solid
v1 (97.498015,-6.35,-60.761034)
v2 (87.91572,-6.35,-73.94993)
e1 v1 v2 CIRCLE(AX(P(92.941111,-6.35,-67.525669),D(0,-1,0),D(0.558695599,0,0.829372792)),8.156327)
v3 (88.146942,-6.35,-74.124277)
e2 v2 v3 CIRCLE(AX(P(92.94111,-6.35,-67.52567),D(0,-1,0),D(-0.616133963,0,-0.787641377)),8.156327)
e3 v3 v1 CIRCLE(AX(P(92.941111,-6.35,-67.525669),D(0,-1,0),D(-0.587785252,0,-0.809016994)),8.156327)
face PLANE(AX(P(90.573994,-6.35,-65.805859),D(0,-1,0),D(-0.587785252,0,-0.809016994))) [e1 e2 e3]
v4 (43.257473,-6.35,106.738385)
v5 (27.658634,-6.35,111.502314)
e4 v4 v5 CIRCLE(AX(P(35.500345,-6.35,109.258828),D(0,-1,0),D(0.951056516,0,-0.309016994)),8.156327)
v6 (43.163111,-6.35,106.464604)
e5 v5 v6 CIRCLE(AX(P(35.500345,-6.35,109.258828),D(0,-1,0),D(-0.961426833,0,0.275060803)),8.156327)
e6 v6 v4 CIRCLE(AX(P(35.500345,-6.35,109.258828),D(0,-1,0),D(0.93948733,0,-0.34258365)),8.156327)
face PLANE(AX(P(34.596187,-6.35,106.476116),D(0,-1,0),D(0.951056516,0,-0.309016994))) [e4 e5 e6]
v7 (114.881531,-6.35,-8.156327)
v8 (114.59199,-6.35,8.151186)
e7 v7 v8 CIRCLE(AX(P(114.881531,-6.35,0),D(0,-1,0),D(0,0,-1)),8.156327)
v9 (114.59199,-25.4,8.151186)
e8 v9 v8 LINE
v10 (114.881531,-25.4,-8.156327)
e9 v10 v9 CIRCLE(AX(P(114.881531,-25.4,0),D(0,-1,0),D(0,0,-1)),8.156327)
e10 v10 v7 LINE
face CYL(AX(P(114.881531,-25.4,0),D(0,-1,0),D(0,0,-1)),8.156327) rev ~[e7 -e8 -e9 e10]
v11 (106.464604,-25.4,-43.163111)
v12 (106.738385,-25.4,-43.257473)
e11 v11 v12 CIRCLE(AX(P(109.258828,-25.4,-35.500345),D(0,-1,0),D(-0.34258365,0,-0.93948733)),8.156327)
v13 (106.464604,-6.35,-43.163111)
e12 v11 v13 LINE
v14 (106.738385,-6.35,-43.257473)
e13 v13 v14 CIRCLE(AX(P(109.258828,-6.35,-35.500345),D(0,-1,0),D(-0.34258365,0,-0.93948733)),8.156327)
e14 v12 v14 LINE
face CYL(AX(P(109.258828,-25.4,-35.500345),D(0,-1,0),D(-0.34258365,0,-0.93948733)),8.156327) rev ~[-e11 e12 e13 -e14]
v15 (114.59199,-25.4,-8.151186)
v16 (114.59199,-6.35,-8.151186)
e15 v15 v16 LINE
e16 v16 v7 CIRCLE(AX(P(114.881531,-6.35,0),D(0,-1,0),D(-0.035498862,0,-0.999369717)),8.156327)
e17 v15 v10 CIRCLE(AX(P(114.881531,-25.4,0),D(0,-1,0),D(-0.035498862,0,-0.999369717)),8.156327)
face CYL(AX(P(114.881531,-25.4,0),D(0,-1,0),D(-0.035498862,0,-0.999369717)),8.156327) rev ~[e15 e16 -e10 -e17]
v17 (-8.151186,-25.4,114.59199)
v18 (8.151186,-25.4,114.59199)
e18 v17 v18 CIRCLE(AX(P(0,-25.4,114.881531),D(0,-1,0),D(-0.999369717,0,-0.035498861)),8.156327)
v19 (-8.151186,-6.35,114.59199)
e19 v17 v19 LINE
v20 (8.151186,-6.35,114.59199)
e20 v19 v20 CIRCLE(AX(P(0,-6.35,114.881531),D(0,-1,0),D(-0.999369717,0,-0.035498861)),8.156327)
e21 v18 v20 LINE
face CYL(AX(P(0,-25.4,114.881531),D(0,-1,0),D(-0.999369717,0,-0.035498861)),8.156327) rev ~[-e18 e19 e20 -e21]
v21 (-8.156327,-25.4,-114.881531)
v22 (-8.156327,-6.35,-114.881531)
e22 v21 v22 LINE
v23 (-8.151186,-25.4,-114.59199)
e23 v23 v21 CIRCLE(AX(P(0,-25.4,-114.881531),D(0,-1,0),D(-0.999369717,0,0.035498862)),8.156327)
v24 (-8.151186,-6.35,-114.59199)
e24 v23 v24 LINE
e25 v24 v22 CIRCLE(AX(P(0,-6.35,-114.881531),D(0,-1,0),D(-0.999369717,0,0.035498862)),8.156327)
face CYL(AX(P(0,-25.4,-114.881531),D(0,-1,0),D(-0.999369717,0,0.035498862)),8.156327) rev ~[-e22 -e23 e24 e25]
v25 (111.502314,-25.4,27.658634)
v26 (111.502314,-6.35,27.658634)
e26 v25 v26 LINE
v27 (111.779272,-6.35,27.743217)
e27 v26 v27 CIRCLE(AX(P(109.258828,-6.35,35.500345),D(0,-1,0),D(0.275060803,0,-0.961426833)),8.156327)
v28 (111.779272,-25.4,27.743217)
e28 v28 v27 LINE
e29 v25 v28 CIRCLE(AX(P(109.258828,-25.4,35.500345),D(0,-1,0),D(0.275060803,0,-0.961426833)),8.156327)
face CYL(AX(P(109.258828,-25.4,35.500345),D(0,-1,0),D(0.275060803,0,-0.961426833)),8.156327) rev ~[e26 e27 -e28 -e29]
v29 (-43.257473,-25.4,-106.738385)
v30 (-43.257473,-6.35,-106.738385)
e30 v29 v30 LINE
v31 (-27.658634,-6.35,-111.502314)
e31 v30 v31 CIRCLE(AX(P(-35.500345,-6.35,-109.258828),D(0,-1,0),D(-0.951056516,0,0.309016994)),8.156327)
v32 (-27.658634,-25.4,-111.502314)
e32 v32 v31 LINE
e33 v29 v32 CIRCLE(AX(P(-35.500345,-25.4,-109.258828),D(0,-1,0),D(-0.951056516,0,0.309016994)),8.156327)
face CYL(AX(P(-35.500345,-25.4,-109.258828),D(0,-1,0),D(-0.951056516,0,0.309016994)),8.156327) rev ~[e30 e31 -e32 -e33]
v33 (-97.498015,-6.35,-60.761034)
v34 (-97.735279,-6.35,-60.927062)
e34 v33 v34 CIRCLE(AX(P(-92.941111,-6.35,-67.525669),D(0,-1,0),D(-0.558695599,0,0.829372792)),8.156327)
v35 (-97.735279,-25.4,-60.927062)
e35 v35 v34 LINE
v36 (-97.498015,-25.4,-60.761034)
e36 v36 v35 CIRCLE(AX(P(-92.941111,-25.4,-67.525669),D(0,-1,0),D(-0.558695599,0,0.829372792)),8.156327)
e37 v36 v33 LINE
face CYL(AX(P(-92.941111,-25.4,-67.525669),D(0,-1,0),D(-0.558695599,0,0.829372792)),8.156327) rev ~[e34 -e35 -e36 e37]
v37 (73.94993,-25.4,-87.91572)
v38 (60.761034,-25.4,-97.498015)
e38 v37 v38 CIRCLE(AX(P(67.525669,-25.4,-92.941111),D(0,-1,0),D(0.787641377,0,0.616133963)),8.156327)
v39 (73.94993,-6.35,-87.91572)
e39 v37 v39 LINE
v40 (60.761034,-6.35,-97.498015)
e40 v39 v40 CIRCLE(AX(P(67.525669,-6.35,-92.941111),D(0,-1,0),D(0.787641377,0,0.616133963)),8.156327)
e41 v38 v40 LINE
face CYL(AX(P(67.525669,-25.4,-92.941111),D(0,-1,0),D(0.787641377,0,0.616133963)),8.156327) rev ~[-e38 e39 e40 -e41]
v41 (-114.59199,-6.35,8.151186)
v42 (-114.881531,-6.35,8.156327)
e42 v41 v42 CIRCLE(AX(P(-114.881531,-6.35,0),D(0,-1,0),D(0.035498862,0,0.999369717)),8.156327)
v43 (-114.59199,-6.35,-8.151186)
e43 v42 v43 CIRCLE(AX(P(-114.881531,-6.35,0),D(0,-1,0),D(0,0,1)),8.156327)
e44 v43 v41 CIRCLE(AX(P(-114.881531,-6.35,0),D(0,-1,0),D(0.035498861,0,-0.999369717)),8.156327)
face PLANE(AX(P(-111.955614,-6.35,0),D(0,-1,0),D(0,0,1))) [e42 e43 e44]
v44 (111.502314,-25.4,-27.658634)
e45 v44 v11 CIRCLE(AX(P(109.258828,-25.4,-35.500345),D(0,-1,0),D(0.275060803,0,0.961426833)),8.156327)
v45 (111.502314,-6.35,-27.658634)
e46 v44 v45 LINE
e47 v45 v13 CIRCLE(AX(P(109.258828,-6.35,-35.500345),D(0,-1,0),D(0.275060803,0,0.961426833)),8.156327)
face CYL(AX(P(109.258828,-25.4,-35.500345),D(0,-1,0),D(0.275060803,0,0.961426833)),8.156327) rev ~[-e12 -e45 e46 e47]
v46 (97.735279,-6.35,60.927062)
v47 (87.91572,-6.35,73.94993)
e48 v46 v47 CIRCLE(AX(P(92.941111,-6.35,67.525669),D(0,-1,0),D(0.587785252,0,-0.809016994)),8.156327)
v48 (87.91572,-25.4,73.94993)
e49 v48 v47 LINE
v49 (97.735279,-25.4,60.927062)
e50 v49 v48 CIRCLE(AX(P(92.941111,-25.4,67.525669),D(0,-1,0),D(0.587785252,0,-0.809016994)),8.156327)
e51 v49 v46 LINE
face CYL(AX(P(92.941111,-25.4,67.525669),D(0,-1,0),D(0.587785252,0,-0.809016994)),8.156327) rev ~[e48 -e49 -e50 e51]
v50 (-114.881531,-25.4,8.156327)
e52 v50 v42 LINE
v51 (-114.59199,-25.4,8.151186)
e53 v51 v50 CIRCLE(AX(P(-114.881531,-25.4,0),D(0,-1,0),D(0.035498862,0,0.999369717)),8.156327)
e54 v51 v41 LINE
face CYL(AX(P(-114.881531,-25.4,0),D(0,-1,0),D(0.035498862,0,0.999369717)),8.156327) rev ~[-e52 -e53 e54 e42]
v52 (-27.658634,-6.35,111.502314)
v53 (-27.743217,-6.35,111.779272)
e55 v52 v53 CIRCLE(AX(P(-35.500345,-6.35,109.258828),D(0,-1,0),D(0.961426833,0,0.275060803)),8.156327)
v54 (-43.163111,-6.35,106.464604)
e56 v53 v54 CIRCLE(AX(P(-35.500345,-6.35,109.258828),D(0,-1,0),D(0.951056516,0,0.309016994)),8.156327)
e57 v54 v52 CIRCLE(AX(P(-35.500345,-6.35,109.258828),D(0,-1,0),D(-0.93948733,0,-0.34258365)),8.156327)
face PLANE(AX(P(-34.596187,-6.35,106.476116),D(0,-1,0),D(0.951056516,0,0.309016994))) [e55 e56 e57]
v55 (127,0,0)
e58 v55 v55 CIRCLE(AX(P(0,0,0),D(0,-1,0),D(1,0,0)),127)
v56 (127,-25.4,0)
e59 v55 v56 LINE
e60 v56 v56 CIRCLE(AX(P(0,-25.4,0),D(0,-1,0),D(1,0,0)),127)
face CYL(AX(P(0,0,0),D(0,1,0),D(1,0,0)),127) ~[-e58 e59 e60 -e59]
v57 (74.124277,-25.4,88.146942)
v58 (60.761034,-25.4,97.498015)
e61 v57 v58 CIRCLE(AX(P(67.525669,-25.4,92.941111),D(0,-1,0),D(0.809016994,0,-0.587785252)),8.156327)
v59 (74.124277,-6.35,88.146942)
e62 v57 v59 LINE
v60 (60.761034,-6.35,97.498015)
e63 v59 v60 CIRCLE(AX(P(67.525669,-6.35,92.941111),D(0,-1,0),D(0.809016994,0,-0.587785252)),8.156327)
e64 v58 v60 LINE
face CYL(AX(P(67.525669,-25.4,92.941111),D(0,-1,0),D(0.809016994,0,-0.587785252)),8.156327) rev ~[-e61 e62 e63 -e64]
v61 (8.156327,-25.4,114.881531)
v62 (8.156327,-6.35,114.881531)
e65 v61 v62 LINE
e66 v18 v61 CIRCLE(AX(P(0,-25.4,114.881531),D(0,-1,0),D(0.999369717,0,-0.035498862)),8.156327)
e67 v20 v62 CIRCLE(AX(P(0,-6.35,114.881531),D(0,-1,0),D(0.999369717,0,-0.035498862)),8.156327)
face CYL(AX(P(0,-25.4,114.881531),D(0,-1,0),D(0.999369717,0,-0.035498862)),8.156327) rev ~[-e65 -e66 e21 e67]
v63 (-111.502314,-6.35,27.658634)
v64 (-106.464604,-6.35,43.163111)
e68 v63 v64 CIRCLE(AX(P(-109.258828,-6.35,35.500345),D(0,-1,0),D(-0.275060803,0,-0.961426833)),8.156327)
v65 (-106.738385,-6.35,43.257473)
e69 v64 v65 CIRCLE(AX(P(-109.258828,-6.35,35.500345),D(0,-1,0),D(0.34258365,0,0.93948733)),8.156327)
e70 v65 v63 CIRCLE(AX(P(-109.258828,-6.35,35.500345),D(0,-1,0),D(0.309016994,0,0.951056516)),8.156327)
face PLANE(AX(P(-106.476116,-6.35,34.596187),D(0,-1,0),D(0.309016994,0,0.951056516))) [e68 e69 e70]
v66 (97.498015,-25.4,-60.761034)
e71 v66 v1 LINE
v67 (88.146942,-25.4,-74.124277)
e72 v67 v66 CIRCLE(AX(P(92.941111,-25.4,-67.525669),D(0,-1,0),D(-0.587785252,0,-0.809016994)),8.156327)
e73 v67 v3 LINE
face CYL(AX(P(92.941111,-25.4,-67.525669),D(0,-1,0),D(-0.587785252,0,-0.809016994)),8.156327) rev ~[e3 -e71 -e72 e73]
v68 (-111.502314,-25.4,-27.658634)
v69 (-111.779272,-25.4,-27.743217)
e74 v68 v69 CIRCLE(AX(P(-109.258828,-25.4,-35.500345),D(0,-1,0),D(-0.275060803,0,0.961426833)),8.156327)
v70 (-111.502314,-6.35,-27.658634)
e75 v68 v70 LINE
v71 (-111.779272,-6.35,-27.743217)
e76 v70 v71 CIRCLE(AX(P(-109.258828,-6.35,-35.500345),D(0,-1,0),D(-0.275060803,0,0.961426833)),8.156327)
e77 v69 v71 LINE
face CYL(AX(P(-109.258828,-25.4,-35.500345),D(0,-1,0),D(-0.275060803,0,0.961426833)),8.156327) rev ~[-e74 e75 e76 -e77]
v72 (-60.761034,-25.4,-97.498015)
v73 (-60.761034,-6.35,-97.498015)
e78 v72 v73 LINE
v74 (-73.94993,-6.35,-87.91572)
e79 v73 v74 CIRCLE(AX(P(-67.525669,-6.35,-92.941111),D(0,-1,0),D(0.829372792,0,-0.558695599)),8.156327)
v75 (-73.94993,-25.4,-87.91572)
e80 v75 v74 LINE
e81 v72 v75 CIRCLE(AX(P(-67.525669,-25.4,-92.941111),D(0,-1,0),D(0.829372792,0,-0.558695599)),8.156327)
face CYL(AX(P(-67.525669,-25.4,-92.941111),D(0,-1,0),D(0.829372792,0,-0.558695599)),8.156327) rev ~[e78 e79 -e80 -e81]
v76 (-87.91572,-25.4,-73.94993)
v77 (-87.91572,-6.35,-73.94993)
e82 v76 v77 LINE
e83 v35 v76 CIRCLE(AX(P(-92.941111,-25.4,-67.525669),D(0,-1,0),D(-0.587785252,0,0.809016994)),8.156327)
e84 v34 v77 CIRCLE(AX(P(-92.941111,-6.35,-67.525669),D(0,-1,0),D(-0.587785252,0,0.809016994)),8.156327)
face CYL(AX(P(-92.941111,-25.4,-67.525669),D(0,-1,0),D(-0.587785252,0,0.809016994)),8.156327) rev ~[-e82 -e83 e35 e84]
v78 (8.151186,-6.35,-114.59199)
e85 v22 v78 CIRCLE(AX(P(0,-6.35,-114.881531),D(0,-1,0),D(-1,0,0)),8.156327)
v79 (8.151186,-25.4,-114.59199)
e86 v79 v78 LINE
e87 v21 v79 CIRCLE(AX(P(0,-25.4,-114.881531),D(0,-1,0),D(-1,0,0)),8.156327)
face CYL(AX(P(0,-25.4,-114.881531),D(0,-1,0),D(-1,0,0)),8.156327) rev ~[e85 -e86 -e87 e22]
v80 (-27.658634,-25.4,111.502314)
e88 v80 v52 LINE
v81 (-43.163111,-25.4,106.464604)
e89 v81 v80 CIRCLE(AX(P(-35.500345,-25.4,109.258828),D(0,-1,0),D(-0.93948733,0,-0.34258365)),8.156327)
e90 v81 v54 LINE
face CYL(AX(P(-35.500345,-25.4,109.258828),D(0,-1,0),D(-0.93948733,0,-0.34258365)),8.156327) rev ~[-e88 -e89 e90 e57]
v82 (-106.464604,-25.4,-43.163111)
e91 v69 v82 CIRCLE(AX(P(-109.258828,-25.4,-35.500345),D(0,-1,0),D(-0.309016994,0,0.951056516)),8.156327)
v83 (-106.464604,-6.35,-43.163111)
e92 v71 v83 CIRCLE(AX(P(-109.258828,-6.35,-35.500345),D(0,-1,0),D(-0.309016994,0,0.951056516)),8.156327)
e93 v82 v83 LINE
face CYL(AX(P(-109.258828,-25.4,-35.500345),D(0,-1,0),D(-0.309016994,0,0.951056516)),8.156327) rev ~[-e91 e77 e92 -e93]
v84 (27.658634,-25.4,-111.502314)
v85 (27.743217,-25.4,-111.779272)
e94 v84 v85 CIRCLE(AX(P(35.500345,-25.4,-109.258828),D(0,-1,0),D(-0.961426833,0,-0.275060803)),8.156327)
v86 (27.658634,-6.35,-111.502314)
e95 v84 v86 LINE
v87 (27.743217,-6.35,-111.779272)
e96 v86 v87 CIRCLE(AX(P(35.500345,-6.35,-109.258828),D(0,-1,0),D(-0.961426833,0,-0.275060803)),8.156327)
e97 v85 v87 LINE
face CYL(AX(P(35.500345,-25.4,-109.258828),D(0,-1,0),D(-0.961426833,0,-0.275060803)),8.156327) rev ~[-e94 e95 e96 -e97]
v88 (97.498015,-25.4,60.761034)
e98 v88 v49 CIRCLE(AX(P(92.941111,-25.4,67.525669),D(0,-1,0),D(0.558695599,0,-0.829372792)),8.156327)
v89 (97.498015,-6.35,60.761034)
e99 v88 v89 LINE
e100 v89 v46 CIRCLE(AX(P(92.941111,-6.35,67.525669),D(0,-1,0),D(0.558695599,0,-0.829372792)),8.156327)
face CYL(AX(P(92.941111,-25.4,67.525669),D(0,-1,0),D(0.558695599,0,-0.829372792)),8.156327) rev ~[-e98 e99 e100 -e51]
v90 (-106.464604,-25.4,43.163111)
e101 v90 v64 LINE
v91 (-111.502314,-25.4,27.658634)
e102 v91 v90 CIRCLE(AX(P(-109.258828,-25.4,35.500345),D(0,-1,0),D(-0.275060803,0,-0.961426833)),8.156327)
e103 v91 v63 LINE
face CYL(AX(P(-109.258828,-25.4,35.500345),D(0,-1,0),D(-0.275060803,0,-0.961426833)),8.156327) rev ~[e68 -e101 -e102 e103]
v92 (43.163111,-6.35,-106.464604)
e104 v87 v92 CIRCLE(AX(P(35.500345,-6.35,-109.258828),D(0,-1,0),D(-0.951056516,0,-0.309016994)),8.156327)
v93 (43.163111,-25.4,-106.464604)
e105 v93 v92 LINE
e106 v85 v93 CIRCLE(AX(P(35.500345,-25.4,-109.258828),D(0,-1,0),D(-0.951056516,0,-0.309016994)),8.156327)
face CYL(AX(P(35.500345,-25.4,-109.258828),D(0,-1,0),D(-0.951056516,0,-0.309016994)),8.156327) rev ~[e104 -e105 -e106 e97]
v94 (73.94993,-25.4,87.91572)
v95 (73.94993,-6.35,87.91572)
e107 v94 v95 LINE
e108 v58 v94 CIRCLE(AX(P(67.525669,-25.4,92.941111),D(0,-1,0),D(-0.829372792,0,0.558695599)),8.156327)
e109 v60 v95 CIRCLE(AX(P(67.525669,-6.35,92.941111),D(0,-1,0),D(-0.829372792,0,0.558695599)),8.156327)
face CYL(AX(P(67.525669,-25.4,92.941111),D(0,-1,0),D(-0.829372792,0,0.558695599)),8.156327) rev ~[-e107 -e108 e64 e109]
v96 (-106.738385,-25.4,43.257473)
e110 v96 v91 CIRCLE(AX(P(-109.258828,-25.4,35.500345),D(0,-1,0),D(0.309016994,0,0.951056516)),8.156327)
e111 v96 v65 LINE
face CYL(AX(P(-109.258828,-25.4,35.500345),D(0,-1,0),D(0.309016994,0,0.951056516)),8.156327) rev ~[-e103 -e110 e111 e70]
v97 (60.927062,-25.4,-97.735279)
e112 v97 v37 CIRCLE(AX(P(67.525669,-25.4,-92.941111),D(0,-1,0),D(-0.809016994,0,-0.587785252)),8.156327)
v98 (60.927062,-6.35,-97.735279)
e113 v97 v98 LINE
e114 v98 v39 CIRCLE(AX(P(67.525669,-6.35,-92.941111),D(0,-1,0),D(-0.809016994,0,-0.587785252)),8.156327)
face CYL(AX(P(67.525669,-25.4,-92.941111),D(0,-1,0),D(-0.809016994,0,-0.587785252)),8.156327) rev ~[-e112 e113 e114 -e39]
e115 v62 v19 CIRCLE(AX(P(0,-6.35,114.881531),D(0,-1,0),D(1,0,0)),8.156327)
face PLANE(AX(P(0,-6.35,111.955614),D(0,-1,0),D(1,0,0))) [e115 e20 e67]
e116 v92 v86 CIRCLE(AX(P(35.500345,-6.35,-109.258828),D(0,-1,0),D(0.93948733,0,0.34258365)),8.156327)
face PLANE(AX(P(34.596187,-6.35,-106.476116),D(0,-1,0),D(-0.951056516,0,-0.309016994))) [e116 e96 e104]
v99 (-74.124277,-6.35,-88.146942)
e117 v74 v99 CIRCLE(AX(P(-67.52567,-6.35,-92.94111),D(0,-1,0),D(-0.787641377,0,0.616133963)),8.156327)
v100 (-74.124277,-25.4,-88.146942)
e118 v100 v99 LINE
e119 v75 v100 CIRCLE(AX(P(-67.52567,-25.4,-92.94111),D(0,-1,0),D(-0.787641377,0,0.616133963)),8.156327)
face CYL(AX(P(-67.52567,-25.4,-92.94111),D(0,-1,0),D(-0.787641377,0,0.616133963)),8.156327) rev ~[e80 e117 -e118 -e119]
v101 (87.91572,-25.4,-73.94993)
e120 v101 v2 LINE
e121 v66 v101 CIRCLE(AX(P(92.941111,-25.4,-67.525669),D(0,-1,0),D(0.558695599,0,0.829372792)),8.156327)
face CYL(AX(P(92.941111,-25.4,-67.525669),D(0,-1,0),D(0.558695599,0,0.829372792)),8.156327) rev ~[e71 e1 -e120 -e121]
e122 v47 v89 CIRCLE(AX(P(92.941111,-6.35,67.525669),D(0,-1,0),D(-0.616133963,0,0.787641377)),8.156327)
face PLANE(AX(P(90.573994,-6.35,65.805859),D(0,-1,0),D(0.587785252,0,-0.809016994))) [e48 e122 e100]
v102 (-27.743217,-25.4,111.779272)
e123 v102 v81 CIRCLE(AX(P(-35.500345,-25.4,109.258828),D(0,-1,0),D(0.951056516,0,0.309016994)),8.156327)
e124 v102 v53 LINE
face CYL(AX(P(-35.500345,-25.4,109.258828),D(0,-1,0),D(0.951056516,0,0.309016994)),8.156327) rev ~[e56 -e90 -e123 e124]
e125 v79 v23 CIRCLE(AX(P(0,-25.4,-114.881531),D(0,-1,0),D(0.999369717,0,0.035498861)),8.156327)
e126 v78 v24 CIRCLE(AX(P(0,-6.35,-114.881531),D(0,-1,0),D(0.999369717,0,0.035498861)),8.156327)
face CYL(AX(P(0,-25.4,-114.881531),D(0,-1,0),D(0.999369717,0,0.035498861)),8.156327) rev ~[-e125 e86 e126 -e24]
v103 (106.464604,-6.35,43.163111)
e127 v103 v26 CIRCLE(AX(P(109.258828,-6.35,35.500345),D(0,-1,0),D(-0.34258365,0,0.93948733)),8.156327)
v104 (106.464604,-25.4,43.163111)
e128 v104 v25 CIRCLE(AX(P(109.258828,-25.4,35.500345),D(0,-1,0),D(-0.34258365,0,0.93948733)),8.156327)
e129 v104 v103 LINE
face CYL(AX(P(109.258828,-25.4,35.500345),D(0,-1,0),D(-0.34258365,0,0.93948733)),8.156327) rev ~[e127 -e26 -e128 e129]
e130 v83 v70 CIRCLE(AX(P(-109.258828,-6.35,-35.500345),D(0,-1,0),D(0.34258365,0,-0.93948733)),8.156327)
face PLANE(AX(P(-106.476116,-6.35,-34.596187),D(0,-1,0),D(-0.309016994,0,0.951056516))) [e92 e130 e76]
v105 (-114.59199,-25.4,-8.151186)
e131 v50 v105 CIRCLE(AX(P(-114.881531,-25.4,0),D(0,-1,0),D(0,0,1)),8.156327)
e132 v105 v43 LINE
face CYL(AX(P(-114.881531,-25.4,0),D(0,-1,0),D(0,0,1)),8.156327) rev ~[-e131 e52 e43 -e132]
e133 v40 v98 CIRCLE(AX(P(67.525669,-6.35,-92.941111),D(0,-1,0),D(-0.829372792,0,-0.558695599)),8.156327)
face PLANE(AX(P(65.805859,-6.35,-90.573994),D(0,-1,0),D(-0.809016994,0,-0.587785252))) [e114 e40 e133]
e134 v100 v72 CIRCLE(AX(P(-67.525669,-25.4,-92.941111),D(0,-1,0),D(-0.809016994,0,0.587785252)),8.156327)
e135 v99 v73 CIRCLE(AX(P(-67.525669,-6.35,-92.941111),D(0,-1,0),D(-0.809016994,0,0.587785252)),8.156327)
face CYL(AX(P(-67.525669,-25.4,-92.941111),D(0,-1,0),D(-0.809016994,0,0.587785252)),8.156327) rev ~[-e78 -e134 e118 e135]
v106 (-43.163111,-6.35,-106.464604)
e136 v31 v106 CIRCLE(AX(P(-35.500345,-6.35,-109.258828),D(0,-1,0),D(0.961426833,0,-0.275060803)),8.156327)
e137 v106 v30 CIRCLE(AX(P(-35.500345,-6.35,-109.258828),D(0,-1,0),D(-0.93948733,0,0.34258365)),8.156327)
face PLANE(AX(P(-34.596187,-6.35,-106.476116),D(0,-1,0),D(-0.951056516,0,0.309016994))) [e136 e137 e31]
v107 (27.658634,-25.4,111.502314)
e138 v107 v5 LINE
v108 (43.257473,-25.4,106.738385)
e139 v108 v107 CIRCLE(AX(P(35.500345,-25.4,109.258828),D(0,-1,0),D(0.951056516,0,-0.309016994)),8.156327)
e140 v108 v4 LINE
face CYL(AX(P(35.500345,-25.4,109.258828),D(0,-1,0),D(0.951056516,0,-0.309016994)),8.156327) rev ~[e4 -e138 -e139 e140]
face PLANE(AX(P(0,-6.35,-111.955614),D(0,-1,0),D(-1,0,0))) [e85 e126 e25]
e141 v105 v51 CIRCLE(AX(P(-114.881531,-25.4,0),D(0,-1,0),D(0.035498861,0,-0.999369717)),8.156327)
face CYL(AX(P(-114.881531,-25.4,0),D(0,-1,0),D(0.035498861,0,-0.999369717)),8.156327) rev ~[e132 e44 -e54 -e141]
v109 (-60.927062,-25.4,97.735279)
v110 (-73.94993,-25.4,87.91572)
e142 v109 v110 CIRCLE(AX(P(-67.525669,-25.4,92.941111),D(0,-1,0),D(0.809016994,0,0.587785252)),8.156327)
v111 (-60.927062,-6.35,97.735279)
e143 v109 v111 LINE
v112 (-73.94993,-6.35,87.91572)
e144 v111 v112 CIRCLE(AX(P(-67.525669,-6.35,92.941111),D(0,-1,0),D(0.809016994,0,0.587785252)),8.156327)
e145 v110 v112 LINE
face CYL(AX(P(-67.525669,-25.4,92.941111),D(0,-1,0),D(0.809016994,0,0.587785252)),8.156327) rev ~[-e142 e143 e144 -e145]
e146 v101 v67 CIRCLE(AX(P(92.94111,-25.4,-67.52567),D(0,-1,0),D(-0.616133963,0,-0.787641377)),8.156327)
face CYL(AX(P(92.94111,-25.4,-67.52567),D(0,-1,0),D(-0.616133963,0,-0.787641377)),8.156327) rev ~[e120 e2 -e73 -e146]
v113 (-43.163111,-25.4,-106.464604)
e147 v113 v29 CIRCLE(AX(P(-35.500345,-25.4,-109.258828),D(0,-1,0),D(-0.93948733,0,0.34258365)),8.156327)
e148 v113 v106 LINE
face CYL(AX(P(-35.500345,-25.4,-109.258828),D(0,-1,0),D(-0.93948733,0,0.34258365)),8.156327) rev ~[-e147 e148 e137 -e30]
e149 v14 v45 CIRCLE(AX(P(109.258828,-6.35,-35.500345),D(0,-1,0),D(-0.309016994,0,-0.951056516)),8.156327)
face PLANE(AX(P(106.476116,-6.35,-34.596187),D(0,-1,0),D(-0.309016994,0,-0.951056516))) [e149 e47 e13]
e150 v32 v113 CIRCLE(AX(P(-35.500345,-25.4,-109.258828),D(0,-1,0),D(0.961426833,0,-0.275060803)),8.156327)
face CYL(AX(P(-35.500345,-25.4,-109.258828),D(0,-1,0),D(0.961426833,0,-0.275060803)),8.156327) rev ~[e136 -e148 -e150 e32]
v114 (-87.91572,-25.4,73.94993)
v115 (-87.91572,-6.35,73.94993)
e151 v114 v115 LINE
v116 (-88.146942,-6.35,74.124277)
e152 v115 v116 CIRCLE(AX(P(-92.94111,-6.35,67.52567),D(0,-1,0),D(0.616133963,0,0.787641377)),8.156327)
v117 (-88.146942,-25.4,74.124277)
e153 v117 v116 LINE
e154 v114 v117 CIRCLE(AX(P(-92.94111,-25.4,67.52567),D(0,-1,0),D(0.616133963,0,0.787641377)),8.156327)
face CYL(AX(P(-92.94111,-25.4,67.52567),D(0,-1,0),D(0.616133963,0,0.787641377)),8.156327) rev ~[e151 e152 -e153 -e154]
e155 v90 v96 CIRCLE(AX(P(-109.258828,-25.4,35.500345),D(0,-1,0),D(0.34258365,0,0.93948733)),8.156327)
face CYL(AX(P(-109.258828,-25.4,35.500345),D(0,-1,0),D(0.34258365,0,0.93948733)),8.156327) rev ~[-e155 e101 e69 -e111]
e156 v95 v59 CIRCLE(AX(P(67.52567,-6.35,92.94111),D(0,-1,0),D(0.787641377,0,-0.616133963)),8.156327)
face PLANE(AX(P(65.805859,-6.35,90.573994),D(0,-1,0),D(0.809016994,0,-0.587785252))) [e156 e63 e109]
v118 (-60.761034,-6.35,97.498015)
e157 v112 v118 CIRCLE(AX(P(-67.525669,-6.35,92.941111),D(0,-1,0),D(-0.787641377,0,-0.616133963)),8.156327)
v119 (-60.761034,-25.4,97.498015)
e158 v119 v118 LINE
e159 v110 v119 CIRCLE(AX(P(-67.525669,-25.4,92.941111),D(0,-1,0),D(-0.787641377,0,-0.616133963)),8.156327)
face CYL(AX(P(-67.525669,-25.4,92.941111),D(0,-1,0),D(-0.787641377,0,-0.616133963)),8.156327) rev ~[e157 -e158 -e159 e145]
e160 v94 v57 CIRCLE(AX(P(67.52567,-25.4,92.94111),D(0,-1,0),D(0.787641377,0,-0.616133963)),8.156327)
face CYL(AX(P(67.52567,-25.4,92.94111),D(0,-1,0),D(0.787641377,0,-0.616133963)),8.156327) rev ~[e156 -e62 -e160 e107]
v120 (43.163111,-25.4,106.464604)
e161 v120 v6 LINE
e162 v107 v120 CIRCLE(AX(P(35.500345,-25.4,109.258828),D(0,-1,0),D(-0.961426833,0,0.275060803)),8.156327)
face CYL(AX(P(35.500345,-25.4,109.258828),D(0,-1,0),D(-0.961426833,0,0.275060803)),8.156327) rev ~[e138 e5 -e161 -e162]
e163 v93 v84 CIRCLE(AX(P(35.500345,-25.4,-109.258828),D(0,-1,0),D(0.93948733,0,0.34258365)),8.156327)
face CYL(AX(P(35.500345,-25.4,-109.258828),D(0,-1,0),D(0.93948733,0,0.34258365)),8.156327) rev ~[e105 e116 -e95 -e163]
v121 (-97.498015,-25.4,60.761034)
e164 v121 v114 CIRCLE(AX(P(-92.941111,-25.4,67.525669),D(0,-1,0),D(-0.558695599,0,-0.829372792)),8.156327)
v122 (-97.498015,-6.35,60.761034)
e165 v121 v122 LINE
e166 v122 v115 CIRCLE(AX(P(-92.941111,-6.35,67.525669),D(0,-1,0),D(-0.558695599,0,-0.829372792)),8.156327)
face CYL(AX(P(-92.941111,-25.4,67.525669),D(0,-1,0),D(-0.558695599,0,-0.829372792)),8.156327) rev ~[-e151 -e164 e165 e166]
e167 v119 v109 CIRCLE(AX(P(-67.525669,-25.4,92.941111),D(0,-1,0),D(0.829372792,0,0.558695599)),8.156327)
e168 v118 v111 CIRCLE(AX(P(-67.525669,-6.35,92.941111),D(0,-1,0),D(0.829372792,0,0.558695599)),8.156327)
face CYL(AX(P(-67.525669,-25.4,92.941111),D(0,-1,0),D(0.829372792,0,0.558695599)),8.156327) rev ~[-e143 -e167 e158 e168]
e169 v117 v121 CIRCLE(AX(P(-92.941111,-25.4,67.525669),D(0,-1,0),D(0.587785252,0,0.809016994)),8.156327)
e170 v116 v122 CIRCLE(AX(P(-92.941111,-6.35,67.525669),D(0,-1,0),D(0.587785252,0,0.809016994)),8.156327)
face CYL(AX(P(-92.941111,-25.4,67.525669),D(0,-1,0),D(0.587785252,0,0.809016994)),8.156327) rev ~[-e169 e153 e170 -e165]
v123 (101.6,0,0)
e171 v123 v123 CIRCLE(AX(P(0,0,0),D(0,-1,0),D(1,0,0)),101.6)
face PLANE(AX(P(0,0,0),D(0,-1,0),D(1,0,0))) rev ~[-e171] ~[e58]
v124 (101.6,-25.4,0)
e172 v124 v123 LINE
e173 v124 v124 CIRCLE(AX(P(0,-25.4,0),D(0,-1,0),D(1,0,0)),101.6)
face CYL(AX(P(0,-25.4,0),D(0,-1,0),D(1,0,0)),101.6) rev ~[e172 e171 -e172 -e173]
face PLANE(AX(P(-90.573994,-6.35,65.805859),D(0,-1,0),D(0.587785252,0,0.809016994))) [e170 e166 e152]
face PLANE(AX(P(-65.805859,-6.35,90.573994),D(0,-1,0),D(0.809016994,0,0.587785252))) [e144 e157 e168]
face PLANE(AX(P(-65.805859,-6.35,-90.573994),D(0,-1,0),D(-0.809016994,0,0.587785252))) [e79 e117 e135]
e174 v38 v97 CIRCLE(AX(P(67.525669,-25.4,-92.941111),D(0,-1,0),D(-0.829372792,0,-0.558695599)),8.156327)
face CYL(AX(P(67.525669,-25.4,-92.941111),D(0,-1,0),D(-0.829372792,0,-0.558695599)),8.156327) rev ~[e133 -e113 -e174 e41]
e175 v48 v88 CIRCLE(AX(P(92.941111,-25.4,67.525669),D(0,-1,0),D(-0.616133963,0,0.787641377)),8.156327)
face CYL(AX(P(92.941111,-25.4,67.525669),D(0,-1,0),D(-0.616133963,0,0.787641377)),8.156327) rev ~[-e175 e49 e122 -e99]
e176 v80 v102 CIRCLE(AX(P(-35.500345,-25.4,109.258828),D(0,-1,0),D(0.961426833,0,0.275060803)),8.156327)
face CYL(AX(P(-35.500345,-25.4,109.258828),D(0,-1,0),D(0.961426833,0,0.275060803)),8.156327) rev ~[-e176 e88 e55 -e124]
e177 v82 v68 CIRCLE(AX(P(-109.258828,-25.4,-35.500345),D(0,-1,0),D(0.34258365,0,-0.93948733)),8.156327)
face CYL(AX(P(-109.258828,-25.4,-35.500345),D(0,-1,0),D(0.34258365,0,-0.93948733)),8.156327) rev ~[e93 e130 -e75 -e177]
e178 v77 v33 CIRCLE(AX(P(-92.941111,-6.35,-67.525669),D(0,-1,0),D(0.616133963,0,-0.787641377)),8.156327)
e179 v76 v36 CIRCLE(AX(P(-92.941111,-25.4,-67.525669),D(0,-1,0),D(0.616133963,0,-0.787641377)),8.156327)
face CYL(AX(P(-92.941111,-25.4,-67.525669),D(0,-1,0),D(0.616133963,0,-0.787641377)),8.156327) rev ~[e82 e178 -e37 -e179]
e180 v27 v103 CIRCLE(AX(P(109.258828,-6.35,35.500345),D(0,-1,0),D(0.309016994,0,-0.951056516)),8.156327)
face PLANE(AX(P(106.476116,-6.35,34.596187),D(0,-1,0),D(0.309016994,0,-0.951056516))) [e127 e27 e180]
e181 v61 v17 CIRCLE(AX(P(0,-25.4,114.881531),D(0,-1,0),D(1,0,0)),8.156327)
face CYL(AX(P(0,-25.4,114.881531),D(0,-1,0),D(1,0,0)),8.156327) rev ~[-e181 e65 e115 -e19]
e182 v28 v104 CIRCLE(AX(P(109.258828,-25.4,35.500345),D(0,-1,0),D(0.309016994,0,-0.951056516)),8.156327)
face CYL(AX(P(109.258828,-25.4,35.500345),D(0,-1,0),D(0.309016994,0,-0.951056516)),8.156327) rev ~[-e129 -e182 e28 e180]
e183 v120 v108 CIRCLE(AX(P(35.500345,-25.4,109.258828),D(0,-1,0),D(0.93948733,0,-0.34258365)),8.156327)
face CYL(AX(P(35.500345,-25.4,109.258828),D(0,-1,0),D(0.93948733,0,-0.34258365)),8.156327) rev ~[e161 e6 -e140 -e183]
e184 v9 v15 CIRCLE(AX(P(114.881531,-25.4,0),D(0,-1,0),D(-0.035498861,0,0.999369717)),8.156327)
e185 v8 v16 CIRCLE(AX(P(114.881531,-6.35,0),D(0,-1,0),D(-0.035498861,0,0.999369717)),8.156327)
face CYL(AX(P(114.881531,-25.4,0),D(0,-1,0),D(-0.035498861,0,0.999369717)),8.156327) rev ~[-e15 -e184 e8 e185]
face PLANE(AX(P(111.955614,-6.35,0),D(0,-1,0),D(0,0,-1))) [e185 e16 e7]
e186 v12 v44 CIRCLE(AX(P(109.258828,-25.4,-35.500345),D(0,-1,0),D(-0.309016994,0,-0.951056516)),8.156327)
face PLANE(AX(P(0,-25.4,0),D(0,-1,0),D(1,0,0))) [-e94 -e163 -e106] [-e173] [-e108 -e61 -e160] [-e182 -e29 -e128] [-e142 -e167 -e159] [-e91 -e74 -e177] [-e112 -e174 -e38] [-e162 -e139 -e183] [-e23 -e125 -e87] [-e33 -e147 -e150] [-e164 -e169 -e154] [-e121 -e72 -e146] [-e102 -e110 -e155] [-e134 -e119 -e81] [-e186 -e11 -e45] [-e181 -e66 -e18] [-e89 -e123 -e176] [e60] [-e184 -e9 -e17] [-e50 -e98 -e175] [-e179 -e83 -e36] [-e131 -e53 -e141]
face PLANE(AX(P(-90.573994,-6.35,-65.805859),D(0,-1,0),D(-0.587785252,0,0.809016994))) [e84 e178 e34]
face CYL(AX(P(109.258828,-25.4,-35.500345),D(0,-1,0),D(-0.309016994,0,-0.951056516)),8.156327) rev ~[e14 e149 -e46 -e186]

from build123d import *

# Parameters (mm, degrees)
F0_R            = 127
F1_DEPTH        = 25.4
F2_R            = 101.6
F3_DEPTH        = 25.401
F5_DEPTH        = 19.05
F5_COPIES_COUNT = 20


# Not quite as in the source:
# - a pattern or mirror of a feature is missing from the dataset's text; its kind, count and spacing are read off the source's solid


with BuildPart() as f1:
    # F0 (on Front) → F1 (new body)
    with BuildSketch(Plane.XZ):
        Circle(F0_R)
    extrude(amount=F1_DEPTH)

    # F2 (on face) → F3 (cut, through all)
    with BuildSketch(Plane.XZ.offset(25.4)):
        Circle(F2_R)
    extrude(amount=-F3_DEPTH, mode=Mode.SUBTRACT)

    # F4 (on face) → F5 (cut)
    with BuildSketch(Plane.XZ.offset(25.4)):
        with BuildLine():
            ThreePointArc((-8.1511862482, 114.5919902466), (0, 106.7252035251), (8.1511862482, 114.5919902466))
            ThreePointArc((8.1511862482, 114.5919902466), (0, 114.8815305693), (-8.1511862482, 114.5919902466))
        make_face()
        with BuildLine():
            ThreePointArc((-8.1511862482, 114.5919902466), (0, 114.8815305693), (8.1511862482, 114.5919902466))
            ThreePointArc((8.1511862482, 114.5919902466), (8.1550417439, 114.736737591), (8.1563270441, 114.8815305693))
            ThreePointArc((8.1563270441, 114.8815305693), (-0.1447929783, 123.0365723132), (-8.1511862482, 114.5919902466))
        make_face()
    f5 = extrude(amount=-F5_DEPTH, mode=Mode.SUBTRACT)

    # F5_copies: F5 ×20 about axis
    f5_copies_axis = Axis((0, 0, 0), (0, 1, 0))
    for i in range(1, F5_COPIES_COUNT):
        add(f5.rotate(f5_copies_axis, i * 360 / F5_COPIES_COUNT), mode=Mode.SUBTRACT)


solid = f1.part
